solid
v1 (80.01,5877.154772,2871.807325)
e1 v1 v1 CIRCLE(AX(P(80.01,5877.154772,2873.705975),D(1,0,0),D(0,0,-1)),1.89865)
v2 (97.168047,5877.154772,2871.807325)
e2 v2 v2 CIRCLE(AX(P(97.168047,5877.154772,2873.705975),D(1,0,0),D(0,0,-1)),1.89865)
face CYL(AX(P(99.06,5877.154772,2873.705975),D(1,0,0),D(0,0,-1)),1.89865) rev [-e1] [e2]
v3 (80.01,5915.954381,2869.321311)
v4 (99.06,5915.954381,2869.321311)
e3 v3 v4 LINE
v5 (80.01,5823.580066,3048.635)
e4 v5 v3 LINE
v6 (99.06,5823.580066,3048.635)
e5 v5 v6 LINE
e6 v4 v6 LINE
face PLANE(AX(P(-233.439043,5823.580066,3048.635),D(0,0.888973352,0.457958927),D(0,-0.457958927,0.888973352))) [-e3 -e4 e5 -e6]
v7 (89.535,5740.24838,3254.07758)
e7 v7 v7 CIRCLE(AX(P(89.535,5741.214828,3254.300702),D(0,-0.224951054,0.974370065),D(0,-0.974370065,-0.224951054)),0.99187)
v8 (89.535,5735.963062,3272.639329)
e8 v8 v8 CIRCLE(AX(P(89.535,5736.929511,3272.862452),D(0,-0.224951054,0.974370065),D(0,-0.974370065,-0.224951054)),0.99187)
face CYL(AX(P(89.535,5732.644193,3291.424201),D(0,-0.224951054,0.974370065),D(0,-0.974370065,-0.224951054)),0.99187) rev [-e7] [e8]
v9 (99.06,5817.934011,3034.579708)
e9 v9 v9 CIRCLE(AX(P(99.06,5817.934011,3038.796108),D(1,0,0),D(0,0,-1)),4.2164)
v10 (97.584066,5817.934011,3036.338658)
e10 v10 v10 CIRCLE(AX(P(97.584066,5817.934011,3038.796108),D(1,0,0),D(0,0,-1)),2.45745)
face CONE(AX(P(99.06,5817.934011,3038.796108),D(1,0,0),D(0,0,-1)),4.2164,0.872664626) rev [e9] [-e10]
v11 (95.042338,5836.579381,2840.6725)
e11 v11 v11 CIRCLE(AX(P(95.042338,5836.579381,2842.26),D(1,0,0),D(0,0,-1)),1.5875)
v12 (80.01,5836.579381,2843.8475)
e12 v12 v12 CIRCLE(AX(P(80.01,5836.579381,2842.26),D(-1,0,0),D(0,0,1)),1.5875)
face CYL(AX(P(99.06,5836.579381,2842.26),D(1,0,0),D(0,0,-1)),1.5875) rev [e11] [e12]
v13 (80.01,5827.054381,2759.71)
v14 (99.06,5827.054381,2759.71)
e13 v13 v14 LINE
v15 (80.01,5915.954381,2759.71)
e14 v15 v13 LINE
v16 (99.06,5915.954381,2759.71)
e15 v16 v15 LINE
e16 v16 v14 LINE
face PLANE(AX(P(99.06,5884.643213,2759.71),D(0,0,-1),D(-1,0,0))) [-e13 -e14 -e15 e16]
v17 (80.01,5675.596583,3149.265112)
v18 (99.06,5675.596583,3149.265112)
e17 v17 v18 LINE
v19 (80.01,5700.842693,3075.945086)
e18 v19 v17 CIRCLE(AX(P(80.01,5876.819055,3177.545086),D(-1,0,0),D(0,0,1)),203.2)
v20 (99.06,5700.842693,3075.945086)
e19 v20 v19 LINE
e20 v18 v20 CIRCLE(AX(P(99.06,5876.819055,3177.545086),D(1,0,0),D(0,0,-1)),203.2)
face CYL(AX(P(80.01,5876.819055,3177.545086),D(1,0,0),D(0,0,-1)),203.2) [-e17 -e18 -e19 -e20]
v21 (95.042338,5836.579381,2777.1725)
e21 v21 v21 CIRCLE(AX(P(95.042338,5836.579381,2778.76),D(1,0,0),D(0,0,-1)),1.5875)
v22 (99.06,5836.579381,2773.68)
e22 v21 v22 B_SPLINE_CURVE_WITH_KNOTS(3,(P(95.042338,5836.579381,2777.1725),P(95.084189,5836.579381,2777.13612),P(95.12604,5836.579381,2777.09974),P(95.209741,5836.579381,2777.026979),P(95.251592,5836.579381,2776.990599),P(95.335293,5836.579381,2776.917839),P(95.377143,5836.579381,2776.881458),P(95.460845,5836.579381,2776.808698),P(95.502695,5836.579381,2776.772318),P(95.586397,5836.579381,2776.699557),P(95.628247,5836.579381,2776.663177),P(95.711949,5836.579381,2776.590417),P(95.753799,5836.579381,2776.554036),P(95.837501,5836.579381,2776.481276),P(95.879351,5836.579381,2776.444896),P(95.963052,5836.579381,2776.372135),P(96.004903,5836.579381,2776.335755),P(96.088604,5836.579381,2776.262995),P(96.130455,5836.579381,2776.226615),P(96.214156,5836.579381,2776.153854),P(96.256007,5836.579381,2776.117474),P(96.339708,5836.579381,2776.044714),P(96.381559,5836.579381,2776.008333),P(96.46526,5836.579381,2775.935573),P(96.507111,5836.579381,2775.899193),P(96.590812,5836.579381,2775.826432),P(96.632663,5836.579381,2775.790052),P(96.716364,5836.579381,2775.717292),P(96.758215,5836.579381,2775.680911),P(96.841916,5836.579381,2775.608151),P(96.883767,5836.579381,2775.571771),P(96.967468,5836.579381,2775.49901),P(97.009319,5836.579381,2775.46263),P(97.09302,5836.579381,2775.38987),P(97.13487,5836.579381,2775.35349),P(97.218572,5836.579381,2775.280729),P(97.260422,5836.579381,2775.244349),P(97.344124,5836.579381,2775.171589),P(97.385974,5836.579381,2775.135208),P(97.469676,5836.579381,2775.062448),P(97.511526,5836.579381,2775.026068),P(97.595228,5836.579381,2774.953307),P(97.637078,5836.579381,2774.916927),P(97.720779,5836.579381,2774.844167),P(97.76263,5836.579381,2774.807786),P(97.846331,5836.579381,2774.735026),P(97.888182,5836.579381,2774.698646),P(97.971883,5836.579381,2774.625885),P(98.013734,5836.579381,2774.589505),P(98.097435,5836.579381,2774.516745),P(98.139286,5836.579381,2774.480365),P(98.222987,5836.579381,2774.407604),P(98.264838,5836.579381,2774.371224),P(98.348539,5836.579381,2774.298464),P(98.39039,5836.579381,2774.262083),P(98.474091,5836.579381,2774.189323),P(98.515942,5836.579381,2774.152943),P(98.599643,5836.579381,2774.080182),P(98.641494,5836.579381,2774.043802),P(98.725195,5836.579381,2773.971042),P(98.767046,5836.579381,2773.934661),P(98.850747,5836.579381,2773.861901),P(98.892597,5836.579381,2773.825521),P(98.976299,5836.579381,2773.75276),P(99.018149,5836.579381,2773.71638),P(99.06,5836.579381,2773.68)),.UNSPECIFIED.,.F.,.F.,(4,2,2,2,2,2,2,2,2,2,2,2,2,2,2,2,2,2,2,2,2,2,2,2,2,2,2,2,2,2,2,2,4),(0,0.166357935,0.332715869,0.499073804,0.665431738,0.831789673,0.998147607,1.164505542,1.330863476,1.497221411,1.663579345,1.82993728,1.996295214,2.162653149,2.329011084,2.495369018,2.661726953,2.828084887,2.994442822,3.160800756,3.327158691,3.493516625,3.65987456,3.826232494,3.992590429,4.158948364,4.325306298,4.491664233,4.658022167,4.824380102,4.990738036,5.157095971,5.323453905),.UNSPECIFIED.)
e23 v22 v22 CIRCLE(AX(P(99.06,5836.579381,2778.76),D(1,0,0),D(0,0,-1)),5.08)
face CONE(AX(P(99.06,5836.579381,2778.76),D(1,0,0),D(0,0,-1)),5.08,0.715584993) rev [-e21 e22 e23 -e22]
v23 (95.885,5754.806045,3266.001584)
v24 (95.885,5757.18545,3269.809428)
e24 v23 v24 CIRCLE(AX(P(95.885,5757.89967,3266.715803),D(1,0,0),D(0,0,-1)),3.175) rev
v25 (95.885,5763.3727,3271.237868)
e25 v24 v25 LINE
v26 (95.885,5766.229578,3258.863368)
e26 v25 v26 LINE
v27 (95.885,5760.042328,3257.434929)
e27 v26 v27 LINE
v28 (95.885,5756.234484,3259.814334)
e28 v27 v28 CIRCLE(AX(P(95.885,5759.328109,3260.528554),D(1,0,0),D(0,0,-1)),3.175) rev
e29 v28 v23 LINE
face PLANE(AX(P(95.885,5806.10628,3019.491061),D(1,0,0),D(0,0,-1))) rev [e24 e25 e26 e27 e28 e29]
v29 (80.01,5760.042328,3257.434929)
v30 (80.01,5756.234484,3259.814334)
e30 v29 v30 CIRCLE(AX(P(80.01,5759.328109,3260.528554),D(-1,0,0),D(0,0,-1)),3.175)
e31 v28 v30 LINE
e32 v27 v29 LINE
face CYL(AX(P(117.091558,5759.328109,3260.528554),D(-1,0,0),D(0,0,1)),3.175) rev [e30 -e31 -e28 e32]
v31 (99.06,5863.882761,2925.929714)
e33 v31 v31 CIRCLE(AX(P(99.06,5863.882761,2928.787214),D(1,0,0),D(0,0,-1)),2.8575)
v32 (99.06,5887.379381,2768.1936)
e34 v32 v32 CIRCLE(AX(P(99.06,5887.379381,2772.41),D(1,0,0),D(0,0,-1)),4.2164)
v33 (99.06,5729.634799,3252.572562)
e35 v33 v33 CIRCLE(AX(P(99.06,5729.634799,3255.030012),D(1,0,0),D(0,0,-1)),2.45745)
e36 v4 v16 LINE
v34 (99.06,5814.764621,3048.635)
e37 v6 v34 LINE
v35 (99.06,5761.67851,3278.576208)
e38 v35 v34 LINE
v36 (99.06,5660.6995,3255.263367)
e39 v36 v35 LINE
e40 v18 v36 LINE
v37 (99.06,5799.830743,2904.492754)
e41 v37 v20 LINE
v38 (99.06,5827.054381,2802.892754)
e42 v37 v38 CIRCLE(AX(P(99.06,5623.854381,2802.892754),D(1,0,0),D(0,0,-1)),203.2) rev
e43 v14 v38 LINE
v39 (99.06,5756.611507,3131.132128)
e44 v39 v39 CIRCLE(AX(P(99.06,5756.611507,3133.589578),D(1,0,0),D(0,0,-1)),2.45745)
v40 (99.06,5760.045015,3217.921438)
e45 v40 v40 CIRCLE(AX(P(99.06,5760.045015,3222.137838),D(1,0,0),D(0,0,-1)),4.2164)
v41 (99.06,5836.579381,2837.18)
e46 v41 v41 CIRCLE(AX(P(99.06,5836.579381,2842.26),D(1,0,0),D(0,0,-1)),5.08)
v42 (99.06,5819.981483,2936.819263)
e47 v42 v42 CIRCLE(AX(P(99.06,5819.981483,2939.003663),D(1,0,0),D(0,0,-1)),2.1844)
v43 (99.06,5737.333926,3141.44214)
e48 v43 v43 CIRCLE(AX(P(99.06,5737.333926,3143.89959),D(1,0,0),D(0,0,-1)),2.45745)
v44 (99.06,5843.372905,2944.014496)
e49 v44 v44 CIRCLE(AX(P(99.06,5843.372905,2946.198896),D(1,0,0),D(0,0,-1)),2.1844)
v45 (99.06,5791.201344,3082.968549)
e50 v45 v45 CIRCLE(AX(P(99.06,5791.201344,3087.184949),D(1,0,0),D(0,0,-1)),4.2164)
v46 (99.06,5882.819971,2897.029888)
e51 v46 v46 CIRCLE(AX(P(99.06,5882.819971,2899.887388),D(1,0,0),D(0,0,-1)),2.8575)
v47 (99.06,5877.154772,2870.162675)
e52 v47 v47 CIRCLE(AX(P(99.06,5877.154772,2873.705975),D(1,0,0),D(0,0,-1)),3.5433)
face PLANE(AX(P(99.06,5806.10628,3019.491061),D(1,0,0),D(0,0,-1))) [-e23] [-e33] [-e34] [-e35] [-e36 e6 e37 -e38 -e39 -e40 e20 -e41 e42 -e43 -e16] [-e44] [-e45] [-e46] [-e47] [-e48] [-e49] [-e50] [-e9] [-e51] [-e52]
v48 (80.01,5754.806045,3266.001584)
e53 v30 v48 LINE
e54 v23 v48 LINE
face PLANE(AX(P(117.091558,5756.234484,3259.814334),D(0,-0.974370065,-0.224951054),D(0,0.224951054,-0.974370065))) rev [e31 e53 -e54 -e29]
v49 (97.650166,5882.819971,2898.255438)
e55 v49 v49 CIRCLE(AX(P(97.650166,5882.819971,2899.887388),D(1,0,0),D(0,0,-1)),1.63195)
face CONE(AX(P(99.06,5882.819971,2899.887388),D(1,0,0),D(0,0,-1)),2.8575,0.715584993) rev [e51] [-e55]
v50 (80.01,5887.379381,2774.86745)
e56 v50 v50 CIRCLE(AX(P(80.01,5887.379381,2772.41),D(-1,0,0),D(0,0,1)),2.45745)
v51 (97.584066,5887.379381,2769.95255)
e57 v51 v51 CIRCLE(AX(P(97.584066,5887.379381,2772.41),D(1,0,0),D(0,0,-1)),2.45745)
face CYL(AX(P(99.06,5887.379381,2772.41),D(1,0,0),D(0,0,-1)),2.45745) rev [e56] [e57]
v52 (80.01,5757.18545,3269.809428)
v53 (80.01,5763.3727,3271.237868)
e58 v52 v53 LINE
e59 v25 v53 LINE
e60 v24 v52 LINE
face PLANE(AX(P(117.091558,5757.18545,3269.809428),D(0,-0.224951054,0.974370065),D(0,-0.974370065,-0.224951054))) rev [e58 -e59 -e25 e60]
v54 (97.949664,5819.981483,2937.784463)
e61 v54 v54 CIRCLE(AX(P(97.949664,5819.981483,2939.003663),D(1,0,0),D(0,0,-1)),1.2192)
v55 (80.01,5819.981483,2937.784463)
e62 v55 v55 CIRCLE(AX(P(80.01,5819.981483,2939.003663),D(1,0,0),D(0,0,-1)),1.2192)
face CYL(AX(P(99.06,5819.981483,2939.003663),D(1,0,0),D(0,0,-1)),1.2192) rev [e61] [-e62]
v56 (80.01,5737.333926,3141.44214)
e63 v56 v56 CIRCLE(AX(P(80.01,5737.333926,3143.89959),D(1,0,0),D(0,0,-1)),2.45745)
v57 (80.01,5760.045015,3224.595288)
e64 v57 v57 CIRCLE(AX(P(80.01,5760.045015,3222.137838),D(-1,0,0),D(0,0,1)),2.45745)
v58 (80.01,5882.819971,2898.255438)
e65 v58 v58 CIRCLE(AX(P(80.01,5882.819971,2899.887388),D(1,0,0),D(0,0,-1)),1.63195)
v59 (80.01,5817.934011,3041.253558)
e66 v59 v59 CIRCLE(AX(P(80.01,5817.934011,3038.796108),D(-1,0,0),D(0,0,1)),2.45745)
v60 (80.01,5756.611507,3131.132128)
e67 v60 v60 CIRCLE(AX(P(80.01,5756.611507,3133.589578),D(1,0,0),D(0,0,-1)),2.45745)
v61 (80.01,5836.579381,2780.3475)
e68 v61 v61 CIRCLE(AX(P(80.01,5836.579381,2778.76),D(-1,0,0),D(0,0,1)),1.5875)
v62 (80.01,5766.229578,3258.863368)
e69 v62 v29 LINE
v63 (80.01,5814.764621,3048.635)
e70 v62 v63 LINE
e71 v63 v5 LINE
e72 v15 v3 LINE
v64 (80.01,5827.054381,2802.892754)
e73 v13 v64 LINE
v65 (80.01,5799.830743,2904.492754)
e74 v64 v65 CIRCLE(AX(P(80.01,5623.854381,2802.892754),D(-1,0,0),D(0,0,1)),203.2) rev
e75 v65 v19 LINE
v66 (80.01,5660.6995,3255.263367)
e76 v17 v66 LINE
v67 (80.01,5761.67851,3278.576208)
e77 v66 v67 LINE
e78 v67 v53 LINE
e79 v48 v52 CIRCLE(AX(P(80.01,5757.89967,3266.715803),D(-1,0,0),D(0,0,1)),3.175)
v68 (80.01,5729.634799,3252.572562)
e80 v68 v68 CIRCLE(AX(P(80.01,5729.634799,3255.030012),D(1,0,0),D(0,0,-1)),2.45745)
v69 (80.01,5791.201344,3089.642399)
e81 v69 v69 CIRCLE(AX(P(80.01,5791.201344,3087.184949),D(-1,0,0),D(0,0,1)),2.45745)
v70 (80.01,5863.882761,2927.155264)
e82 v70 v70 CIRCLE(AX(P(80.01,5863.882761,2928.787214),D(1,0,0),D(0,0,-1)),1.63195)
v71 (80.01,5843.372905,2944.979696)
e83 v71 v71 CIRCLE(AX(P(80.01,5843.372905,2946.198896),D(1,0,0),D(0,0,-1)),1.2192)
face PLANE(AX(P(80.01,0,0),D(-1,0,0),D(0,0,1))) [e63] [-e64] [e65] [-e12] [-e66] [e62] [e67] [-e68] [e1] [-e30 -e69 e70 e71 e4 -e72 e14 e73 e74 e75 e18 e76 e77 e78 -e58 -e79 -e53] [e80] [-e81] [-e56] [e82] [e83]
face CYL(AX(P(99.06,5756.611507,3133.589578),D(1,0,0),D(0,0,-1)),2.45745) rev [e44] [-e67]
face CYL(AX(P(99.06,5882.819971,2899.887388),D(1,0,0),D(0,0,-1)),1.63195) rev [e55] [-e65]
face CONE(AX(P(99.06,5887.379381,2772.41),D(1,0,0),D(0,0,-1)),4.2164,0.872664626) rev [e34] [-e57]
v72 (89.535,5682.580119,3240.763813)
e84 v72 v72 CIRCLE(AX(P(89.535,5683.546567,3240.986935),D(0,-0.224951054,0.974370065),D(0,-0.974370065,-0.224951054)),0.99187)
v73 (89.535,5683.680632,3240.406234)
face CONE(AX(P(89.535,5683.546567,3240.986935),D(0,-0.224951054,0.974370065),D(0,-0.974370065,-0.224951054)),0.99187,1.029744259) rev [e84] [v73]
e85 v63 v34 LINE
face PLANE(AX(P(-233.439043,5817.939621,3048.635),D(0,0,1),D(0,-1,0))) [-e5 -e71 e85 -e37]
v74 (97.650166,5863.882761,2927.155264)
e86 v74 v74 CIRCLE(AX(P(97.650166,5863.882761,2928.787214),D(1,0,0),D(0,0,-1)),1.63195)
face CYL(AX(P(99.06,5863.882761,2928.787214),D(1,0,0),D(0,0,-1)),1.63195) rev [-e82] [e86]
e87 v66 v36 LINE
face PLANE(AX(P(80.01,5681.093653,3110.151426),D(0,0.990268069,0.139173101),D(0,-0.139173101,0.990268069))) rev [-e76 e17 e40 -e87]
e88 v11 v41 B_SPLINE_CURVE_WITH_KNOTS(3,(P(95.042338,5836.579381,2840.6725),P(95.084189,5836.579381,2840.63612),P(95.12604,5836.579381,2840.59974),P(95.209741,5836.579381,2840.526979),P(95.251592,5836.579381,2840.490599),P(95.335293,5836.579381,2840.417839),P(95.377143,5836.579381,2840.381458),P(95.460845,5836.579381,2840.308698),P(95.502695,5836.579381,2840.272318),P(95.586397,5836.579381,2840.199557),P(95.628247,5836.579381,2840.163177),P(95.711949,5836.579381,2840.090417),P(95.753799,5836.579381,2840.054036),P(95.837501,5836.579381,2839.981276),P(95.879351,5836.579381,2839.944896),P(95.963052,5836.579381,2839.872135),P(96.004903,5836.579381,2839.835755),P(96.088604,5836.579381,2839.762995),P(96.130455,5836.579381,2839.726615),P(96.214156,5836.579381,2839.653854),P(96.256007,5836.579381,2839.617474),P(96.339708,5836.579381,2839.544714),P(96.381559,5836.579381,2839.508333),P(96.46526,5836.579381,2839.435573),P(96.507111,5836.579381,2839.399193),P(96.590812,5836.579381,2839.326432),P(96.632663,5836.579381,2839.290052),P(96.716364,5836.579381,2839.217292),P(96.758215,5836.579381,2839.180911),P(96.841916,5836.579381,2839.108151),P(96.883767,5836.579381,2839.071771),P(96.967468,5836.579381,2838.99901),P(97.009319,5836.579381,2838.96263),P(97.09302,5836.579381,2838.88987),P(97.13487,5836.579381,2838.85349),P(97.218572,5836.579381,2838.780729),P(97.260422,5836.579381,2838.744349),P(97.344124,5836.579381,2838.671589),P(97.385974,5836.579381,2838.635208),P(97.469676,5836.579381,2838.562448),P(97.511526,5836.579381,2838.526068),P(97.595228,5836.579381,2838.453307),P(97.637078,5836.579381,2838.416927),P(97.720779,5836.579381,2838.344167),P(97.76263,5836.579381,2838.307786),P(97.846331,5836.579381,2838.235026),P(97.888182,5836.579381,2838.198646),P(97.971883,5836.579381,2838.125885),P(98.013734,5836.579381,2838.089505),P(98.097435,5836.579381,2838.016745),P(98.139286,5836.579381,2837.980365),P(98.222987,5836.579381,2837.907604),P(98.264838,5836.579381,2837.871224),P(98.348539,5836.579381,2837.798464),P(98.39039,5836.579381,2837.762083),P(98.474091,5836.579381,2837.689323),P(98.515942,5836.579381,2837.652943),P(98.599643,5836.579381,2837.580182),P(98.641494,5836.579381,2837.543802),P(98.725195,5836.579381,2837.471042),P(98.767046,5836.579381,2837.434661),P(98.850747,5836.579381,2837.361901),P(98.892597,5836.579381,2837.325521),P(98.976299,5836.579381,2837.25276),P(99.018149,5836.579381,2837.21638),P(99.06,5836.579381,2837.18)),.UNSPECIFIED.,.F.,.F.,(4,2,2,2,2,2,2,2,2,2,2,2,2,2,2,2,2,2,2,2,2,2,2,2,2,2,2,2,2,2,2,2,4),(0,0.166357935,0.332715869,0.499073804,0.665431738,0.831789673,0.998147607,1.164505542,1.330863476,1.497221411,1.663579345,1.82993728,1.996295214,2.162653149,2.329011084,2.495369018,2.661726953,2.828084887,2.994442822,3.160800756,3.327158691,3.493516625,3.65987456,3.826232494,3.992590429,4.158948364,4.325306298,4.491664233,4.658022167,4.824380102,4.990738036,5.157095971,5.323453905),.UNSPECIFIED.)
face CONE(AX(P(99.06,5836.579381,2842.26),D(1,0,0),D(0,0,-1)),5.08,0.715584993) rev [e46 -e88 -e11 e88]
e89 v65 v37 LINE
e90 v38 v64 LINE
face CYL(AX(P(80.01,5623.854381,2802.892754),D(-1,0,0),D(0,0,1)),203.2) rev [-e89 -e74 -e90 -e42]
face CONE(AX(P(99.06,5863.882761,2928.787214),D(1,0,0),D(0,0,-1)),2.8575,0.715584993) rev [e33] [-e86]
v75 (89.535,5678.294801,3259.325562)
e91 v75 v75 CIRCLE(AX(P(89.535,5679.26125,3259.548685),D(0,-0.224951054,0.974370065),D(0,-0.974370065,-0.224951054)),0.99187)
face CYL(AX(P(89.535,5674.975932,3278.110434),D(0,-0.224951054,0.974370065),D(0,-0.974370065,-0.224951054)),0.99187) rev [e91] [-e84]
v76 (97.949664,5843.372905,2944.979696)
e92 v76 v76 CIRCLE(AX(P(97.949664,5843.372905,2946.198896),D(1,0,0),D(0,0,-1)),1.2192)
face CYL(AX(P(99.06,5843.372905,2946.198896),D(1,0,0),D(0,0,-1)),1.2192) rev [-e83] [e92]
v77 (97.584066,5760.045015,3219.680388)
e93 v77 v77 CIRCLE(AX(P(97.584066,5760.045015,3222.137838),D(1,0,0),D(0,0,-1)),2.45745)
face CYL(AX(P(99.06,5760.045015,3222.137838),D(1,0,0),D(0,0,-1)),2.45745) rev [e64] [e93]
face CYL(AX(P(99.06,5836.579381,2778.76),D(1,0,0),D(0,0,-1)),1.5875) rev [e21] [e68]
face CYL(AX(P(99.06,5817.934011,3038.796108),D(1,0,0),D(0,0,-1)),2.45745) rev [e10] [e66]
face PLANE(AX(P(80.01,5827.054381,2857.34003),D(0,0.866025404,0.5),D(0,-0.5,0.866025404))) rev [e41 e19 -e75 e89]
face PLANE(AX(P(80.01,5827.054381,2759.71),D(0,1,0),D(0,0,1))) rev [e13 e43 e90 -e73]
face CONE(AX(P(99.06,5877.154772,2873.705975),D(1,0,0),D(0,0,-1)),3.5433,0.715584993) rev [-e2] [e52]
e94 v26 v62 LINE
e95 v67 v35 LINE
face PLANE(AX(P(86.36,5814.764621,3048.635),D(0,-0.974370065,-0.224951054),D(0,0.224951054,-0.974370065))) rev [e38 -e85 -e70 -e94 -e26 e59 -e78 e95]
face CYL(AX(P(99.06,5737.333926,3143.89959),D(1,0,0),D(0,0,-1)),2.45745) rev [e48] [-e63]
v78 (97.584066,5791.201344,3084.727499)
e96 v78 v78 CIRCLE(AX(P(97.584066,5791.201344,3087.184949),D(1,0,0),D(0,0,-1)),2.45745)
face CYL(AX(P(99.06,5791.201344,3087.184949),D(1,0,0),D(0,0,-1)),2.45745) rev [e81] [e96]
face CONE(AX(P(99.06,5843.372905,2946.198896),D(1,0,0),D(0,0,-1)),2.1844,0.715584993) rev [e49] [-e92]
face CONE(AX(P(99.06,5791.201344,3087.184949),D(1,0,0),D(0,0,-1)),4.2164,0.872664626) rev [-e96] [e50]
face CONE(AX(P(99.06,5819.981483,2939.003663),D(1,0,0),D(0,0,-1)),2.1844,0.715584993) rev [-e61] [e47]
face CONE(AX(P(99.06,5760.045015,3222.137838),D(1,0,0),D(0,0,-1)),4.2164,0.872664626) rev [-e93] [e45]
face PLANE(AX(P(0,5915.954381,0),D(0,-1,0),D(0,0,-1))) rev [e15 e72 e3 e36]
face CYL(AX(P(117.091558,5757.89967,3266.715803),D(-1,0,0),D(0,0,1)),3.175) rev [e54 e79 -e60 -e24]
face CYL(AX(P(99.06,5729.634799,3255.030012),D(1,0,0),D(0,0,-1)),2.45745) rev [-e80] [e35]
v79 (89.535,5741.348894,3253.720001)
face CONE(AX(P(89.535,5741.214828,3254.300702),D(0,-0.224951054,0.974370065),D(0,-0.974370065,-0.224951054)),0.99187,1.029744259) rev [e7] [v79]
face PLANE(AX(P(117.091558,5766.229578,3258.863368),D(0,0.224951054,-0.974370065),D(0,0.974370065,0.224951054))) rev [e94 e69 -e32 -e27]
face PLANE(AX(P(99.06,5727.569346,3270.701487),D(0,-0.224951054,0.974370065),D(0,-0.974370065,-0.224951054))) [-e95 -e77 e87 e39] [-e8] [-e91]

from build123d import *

# Parameters (mm, degrees)
BOSS_EXTRUDE1_START                               = -12.7
BOSS_EXTRUDE1_DEPTH                               = 12.7
CUT_EXTRUDE1_DEPTH                                = 6799.247512927
BOSS_EXTRUDE2_DEPTH                               = 6.35
BOSS_EXTRUDE3_DEPTH                               = 19.05
CUT_EXTRUDE2_REACH                                = 3294.662
SKETCH5_W                                         = 19.05
SKETCH5_H                                         = 70.738300655
F_8_START                                         = 79
F_8_CLEARANCE_HOLE1_OUTLINE_R                     = 2.45745
F_8_CLEARANCE_HOLE1_DEPTH                         = 21
SKETCH22_W                                        = 19.05
SKETCH22_H                                        = 109.611311192
CUT_EXTRUDE3_DEPTH                                = 20.02562
CSK_FOR_8_FLAT_HEAD_MACHINE_SCREW_100_D           = 4.9149
CSK_FOR_8_FLAT_HEAD_MACHINE_SCREW_100_CSINK_D     = 8.4328
CSK_FOR_8_FLAT_HEAD_MACHINE_SCREW_100_CSINK_ANGLE = 100
CUT_EXTRUDE4_DEPTH                                = 6764.722428504
FILLET1_R                                         = 203.2
HOLE6_D                                           = 3.175
HOLE6_DEPTH                                       = 31.75
HOLE6_CSINK_D                                     = 10.16
HOLE6_CSINK_ANGLE                                 = 82
HOLE6_TIP                                         = 0.953866233
CSK_FOR_6_FLAT_HEAD_MACHINE_SCREW1_D              = 3.7973
CSK_FOR_6_FLAT_HEAD_MACHINE_SCREW1_CSINK_D        = 7.0866
CSK_FOR_6_FLAT_HEAD_MACHINE_SCREW1_CSINK_ANGLE    = 82
CSK_FOR_4_FLAT_HEAD_MACHINE_SCREW1_D              = 3.2639
CSK_FOR_4_FLAT_HEAD_MACHINE_SCREW1_CSINK_D        = 5.715
CSK_FOR_4_FLAT_HEAD_MACHINE_SCREW1_CSINK_ANGLE    = 82
CSK_FOR_2_FLAT_HEAD_MACHINE_SCREW1_D              = 2.4384
CSK_FOR_2_FLAT_HEAD_MACHINE_SCREW1_CSINK_D        = 4.3688
CSK_FOR_2_FLAT_HEAD_MACHINE_SCREW1_CSINK_ANGLE    = 82
CUT_EXTRUDE6_DEPTH                                = 15.875


with BuildPart() as part:
    # Boss-Extrude1: read off the stored shape, not the designer's step
    # Boss-Extrude1 outline → Boss-Extrude1 (new body)
    with BuildSketch(Plane(origin=(99.06, 0, 0), x_dir=(0, 0, -1), z_dir=(1, 0, 0)).offset(BOSS_EXTRUDE1_START)):
        Polygon((-3048.635, 5823.580065533), (-3048.635, 5817.939621245), (-3279.272122652, 5764.692845932), (-3270.701487481, 5727.569346464), (-2759.71, 5845.541026859), (-2759.71, 5955.030000144), (-2807.335, 5955.030000144), (-2804.426960815, 5949.385019356), align=None)
    extrude(amount=BOSS_EXTRUDE1_DEPTH)

    # Sketch2 → Cut-Extrude1 (cut, through all)
    with BuildSketch(Plane(origin=(99.06, 0, 0), x_dir=(0, 0, -1), z_dir=(1, 0, 0))):
        Polygon((-3279.272122652, 5764.692845932), (-3048.635, 5817.939621245), (-3048.635, 5814.764621245), (-3278.576208456, 5761.678510384), align=None)
    extrude(amount=-CUT_EXTRUDE1_DEPTH, mode=Mode.SUBTRACT)

    # Sketch3 → Boss-Extrude2 (add)
    with BuildSketch(Plane.ZY.offset(-86.36)):
        Polygon((3278.576208456, 5761.678510384), (3048.635, 5814.764621245), (3048.635, 5823.580065533), (2804.426960815, 5949.385019356), (2807.335, 5955.030000144), (2759.71, 5955.030000144), (2759.71, 5845.541026859), (3270.701487481, 5727.569346464), align=None)
    extrude(amount=BOSS_EXTRUDE2_DEPTH)

    # Sketch4 → Boss-Extrude3 (add, through all)
    with BuildSketch(Plane.ZY.offset(-80.01)):
        Polygon((2759.71, 5845.541026859), (3270.701487481, 5727.569346464), (3252.406488556, 5648.325), (2759.71, 5648.325), align=None)
    extrude(amount=-BOSS_EXTRUDE3_DEPTH)

    # Sketch5 → Cut-Extrude2 (cut, up to next)
    with BuildSketch(Plane(origin=(0, 5935.980000144, 0), x_dir=(1, 0, 0), z_dir=(0, 1, 0)), mode=Mode.PRIVATE) as cut_extrude2_sk1:
        with Locations((89.535, -2795.079150328)):
            Rectangle(SKETCH5_W, SKETCH5_H)
    cut_extrude2_tool1 = extrude(cut_extrude2_sk1.sketch, amount=CUT_EXTRUDE2_REACH, mode=Mode.PRIVATE) & part.part
    add(cut_extrude2_tool1.solids().sort_by_distance((89.535, 5935.98, 2795.07915))[0], mode=Mode.SUBTRACT)

    # #8 Clearance Hole1: read off the stored shape, not the designer's step
    # #8 Clearance Hole1 outline → #8 Clearance Hole1 (cut)
    with BuildSketch(Plane.YZ.offset(F_8_START)):
        with Locations((5737.333926367, 3143.899589677)):
            Circle(F_8_CLEARANCE_HOLE1_OUTLINE_R)
        with Locations((5756.611506802, 3133.589577954)):
            Circle(F_8_CLEARANCE_HOLE1_OUTLINE_R)
        with Locations((5729.634798773, 3255.030012286)):
            Circle(F_8_CLEARANCE_HOLE1_OUTLINE_R)
    extrude(amount=F_8_CLEARANCE_HOLE1_DEPTH, mode=Mode.SUBTRACT)

    # 8 Clearance Hole1 2 outline → 8 Clearance Hole1 2 (revolve, cut)
    with BuildSketch(Plane(origin=(89.535, 6106.319771445, 1409.755000067), x_dir=(1, 0, 0), z_dir=(0, 0.9743700647852487, 0.2249510543438069))):
        Polygon((0.99187, -1879.400856936), (0, -1878.804881314), (0, -1898.450856936), (0.99187, -1898.450856936), align=None)
    revolve(axis=Axis((89.535, 6106.319771445, 1409.755000067), (0, 0.2249510543438069, -0.9743700647852487)), mode=Mode.SUBTRACT)

    # 8 Clearance Hole1 3 outline → 8 Clearance Hole1 3 (revolve, cut)
    with BuildSketch(Plane(origin=(89.535, 6163.988032626, 1423.068767212), x_dir=(1, 0, 0), z_dir=(0, 0.9743700647852487, 0.2249510543438069))):
        Polygon((0.99187, -1879.400856936), (0, -1878.804881314), (0, -1898.450856936), (0.99187, -1898.450856936), align=None)
    revolve(axis=Axis((89.535, 6163.988032626, 1423.068767212), (0, 0.2249510543438069, -0.9743700647852487)), mode=Mode.SUBTRACT)

    # Sketch22 → Cut-Extrude3 (cut)
    with BuildSketch(Plane(origin=(0, 5935.980000144, 0), x_dir=(1, 0, 0), z_dir=(0, 1, 0))):
        with Locations((89.535, -2814.515655596)):
            Rectangle(SKETCH22_W, SKETCH22_H)
    extrude(amount=-CUT_EXTRUDE3_DEPTH, mode=Mode.SUBTRACT)

    # CSK for #8 Flat Head Machine Screw (100)1 (through all)
    with Locations(Plane(origin=(99.06, 0, 0), x_dir=(0, 0, -1), z_dir=(1, 0, 0))):
        with Locations((-3222.137837611, 5760.045015031), (-3087.184948706, 5791.20134438), (-3038.796108056, 5817.934011474), (-2772.41, 5887.379380546)):
            CounterSinkHole(CSK_FOR_8_FLAT_HEAD_MACHINE_SCREW_100_D / 2, CSK_FOR_8_FLAT_HEAD_MACHINE_SCREW_100_CSINK_D / 2, counter_sink_angle=CSK_FOR_8_FLAT_HEAD_MACHINE_SCREW_100_CSINK_ANGLE)

    # Sketch26 → Cut-Extrude4 (cut, through all)
    with BuildSketch(Plane(origin=(99.06, 0, 0), x_dir=(0, 0, -1), z_dir=(1, 0, 0))):
        Polygon((-3252.406488556, 5648.325), (-2759.71, 5648.325), (-2759.71, 5827.054380546), (-2857.340029902, 5827.054380546), (-3110.151425601, 5681.093653185), (-3255.263366946, 5660.699499823), align=None)
    extrude(amount=-CUT_EXTRUDE4_DEPTH, mode=Mode.SUBTRACT)

    # Fillet1
    fillet1_edges = [part.edges().sort_by_distance(p)[0] for p in [
        (89.535, 5681.093653185, 3110.151425601),
        (89.535, 5827.054380546, 2857.340029902),
    ]]
    fillet(fillet1_edges, radius=FILLET1_R)

    # Hole6
    with Locations(Plane(origin=(99.06, 0, 0), x_dir=(0, 0, -1), z_dir=(1, 0, 0))):
        with Locations((-2778.76, 5836.579380546), (-2842.26, 5836.579380546)):
            CounterSinkHole(HOLE6_D / 2, HOLE6_CSINK_D / 2, depth=HOLE6_DEPTH, counter_sink_angle=HOLE6_CSINK_ANGLE)
            with Locations((0, 0, -(HOLE6_DEPTH + HOLE6_TIP / 2))):  # 118° drill point
                Cone(0, HOLE6_D / 2, HOLE6_TIP, mode=Mode.SUBTRACT)

    # CSK for #6 Flat Head Machine Screw1 (through all)
    with Locations(Plane(origin=(99.06, 0, 0), x_dir=(0, 0, -1), z_dir=(1, 0, 0))):
        with Locations((-2873.705975086, 5877.154772353)):
            CounterSinkHole(CSK_FOR_6_FLAT_HEAD_MACHINE_SCREW1_D / 2, CSK_FOR_6_FLAT_HEAD_MACHINE_SCREW1_CSINK_D / 2, counter_sink_angle=CSK_FOR_6_FLAT_HEAD_MACHINE_SCREW1_CSINK_ANGLE)

    # CSK for #4 Flat Head Machine Screw1 (through all)
    with Locations(Plane(origin=(99.06, 0, 0), x_dir=(0, 0, -1), z_dir=(1, 0, 0))):
        with Locations((-2928.787214128, 5863.882760898), (-2899.887388336, 5882.819970608)):
            CounterSinkHole(CSK_FOR_4_FLAT_HEAD_MACHINE_SCREW1_D / 2, CSK_FOR_4_FLAT_HEAD_MACHINE_SCREW1_CSINK_D / 2, counter_sink_angle=CSK_FOR_4_FLAT_HEAD_MACHINE_SCREW1_CSINK_ANGLE)

    # CSK for #2 Flat Head Machine Screw1 (through all)
    with Locations(Plane(origin=(99.06, 0, 0), x_dir=(0, 0, -1), z_dir=(1, 0, 0))):
        with Locations((-2939.003662809, 5819.981482761), (-2946.198895696, 5843.372904772)):
            CounterSinkHole(CSK_FOR_2_FLAT_HEAD_MACHINE_SCREW1_D / 2, CSK_FOR_2_FLAT_HEAD_MACHINE_SCREW1_CSINK_D / 2, counter_sink_angle=CSK_FOR_2_FLAT_HEAD_MACHINE_SCREW1_CSINK_ANGLE)

    # Sketch36 → Cut-Extrude6 (cut)
    with BuildSketch(Plane.ZY.offset(-80.01)):
        with BuildLine():
            Line((3271.237867638, 5763.372699854), (3258.863367816, 5766.229578244))
            Line((3258.863367816, 5766.229578244), (3257.43492862, 5760.042328333))
            ThreePointArc((3257.43492862, 5760.042328333), (3257.836000871, 5757.645615071), (3259.814333979, 5756.23448378))
            Line((3259.814333979, 5756.23448378), (3266.00158389, 5754.806044585))
            ThreePointArc((3266.00158389, 5754.806044585), (3268.398297151, 5755.207116835), (3269.809428443, 5757.185449943))
            Line((3269.809428443, 5757.185449943), (3271.237867638, 5763.372699854))
        make_face()
    extrude(amount=-CUT_EXTRUDE6_DEPTH, mode=Mode.SUBTRACT)


solid = part.part
